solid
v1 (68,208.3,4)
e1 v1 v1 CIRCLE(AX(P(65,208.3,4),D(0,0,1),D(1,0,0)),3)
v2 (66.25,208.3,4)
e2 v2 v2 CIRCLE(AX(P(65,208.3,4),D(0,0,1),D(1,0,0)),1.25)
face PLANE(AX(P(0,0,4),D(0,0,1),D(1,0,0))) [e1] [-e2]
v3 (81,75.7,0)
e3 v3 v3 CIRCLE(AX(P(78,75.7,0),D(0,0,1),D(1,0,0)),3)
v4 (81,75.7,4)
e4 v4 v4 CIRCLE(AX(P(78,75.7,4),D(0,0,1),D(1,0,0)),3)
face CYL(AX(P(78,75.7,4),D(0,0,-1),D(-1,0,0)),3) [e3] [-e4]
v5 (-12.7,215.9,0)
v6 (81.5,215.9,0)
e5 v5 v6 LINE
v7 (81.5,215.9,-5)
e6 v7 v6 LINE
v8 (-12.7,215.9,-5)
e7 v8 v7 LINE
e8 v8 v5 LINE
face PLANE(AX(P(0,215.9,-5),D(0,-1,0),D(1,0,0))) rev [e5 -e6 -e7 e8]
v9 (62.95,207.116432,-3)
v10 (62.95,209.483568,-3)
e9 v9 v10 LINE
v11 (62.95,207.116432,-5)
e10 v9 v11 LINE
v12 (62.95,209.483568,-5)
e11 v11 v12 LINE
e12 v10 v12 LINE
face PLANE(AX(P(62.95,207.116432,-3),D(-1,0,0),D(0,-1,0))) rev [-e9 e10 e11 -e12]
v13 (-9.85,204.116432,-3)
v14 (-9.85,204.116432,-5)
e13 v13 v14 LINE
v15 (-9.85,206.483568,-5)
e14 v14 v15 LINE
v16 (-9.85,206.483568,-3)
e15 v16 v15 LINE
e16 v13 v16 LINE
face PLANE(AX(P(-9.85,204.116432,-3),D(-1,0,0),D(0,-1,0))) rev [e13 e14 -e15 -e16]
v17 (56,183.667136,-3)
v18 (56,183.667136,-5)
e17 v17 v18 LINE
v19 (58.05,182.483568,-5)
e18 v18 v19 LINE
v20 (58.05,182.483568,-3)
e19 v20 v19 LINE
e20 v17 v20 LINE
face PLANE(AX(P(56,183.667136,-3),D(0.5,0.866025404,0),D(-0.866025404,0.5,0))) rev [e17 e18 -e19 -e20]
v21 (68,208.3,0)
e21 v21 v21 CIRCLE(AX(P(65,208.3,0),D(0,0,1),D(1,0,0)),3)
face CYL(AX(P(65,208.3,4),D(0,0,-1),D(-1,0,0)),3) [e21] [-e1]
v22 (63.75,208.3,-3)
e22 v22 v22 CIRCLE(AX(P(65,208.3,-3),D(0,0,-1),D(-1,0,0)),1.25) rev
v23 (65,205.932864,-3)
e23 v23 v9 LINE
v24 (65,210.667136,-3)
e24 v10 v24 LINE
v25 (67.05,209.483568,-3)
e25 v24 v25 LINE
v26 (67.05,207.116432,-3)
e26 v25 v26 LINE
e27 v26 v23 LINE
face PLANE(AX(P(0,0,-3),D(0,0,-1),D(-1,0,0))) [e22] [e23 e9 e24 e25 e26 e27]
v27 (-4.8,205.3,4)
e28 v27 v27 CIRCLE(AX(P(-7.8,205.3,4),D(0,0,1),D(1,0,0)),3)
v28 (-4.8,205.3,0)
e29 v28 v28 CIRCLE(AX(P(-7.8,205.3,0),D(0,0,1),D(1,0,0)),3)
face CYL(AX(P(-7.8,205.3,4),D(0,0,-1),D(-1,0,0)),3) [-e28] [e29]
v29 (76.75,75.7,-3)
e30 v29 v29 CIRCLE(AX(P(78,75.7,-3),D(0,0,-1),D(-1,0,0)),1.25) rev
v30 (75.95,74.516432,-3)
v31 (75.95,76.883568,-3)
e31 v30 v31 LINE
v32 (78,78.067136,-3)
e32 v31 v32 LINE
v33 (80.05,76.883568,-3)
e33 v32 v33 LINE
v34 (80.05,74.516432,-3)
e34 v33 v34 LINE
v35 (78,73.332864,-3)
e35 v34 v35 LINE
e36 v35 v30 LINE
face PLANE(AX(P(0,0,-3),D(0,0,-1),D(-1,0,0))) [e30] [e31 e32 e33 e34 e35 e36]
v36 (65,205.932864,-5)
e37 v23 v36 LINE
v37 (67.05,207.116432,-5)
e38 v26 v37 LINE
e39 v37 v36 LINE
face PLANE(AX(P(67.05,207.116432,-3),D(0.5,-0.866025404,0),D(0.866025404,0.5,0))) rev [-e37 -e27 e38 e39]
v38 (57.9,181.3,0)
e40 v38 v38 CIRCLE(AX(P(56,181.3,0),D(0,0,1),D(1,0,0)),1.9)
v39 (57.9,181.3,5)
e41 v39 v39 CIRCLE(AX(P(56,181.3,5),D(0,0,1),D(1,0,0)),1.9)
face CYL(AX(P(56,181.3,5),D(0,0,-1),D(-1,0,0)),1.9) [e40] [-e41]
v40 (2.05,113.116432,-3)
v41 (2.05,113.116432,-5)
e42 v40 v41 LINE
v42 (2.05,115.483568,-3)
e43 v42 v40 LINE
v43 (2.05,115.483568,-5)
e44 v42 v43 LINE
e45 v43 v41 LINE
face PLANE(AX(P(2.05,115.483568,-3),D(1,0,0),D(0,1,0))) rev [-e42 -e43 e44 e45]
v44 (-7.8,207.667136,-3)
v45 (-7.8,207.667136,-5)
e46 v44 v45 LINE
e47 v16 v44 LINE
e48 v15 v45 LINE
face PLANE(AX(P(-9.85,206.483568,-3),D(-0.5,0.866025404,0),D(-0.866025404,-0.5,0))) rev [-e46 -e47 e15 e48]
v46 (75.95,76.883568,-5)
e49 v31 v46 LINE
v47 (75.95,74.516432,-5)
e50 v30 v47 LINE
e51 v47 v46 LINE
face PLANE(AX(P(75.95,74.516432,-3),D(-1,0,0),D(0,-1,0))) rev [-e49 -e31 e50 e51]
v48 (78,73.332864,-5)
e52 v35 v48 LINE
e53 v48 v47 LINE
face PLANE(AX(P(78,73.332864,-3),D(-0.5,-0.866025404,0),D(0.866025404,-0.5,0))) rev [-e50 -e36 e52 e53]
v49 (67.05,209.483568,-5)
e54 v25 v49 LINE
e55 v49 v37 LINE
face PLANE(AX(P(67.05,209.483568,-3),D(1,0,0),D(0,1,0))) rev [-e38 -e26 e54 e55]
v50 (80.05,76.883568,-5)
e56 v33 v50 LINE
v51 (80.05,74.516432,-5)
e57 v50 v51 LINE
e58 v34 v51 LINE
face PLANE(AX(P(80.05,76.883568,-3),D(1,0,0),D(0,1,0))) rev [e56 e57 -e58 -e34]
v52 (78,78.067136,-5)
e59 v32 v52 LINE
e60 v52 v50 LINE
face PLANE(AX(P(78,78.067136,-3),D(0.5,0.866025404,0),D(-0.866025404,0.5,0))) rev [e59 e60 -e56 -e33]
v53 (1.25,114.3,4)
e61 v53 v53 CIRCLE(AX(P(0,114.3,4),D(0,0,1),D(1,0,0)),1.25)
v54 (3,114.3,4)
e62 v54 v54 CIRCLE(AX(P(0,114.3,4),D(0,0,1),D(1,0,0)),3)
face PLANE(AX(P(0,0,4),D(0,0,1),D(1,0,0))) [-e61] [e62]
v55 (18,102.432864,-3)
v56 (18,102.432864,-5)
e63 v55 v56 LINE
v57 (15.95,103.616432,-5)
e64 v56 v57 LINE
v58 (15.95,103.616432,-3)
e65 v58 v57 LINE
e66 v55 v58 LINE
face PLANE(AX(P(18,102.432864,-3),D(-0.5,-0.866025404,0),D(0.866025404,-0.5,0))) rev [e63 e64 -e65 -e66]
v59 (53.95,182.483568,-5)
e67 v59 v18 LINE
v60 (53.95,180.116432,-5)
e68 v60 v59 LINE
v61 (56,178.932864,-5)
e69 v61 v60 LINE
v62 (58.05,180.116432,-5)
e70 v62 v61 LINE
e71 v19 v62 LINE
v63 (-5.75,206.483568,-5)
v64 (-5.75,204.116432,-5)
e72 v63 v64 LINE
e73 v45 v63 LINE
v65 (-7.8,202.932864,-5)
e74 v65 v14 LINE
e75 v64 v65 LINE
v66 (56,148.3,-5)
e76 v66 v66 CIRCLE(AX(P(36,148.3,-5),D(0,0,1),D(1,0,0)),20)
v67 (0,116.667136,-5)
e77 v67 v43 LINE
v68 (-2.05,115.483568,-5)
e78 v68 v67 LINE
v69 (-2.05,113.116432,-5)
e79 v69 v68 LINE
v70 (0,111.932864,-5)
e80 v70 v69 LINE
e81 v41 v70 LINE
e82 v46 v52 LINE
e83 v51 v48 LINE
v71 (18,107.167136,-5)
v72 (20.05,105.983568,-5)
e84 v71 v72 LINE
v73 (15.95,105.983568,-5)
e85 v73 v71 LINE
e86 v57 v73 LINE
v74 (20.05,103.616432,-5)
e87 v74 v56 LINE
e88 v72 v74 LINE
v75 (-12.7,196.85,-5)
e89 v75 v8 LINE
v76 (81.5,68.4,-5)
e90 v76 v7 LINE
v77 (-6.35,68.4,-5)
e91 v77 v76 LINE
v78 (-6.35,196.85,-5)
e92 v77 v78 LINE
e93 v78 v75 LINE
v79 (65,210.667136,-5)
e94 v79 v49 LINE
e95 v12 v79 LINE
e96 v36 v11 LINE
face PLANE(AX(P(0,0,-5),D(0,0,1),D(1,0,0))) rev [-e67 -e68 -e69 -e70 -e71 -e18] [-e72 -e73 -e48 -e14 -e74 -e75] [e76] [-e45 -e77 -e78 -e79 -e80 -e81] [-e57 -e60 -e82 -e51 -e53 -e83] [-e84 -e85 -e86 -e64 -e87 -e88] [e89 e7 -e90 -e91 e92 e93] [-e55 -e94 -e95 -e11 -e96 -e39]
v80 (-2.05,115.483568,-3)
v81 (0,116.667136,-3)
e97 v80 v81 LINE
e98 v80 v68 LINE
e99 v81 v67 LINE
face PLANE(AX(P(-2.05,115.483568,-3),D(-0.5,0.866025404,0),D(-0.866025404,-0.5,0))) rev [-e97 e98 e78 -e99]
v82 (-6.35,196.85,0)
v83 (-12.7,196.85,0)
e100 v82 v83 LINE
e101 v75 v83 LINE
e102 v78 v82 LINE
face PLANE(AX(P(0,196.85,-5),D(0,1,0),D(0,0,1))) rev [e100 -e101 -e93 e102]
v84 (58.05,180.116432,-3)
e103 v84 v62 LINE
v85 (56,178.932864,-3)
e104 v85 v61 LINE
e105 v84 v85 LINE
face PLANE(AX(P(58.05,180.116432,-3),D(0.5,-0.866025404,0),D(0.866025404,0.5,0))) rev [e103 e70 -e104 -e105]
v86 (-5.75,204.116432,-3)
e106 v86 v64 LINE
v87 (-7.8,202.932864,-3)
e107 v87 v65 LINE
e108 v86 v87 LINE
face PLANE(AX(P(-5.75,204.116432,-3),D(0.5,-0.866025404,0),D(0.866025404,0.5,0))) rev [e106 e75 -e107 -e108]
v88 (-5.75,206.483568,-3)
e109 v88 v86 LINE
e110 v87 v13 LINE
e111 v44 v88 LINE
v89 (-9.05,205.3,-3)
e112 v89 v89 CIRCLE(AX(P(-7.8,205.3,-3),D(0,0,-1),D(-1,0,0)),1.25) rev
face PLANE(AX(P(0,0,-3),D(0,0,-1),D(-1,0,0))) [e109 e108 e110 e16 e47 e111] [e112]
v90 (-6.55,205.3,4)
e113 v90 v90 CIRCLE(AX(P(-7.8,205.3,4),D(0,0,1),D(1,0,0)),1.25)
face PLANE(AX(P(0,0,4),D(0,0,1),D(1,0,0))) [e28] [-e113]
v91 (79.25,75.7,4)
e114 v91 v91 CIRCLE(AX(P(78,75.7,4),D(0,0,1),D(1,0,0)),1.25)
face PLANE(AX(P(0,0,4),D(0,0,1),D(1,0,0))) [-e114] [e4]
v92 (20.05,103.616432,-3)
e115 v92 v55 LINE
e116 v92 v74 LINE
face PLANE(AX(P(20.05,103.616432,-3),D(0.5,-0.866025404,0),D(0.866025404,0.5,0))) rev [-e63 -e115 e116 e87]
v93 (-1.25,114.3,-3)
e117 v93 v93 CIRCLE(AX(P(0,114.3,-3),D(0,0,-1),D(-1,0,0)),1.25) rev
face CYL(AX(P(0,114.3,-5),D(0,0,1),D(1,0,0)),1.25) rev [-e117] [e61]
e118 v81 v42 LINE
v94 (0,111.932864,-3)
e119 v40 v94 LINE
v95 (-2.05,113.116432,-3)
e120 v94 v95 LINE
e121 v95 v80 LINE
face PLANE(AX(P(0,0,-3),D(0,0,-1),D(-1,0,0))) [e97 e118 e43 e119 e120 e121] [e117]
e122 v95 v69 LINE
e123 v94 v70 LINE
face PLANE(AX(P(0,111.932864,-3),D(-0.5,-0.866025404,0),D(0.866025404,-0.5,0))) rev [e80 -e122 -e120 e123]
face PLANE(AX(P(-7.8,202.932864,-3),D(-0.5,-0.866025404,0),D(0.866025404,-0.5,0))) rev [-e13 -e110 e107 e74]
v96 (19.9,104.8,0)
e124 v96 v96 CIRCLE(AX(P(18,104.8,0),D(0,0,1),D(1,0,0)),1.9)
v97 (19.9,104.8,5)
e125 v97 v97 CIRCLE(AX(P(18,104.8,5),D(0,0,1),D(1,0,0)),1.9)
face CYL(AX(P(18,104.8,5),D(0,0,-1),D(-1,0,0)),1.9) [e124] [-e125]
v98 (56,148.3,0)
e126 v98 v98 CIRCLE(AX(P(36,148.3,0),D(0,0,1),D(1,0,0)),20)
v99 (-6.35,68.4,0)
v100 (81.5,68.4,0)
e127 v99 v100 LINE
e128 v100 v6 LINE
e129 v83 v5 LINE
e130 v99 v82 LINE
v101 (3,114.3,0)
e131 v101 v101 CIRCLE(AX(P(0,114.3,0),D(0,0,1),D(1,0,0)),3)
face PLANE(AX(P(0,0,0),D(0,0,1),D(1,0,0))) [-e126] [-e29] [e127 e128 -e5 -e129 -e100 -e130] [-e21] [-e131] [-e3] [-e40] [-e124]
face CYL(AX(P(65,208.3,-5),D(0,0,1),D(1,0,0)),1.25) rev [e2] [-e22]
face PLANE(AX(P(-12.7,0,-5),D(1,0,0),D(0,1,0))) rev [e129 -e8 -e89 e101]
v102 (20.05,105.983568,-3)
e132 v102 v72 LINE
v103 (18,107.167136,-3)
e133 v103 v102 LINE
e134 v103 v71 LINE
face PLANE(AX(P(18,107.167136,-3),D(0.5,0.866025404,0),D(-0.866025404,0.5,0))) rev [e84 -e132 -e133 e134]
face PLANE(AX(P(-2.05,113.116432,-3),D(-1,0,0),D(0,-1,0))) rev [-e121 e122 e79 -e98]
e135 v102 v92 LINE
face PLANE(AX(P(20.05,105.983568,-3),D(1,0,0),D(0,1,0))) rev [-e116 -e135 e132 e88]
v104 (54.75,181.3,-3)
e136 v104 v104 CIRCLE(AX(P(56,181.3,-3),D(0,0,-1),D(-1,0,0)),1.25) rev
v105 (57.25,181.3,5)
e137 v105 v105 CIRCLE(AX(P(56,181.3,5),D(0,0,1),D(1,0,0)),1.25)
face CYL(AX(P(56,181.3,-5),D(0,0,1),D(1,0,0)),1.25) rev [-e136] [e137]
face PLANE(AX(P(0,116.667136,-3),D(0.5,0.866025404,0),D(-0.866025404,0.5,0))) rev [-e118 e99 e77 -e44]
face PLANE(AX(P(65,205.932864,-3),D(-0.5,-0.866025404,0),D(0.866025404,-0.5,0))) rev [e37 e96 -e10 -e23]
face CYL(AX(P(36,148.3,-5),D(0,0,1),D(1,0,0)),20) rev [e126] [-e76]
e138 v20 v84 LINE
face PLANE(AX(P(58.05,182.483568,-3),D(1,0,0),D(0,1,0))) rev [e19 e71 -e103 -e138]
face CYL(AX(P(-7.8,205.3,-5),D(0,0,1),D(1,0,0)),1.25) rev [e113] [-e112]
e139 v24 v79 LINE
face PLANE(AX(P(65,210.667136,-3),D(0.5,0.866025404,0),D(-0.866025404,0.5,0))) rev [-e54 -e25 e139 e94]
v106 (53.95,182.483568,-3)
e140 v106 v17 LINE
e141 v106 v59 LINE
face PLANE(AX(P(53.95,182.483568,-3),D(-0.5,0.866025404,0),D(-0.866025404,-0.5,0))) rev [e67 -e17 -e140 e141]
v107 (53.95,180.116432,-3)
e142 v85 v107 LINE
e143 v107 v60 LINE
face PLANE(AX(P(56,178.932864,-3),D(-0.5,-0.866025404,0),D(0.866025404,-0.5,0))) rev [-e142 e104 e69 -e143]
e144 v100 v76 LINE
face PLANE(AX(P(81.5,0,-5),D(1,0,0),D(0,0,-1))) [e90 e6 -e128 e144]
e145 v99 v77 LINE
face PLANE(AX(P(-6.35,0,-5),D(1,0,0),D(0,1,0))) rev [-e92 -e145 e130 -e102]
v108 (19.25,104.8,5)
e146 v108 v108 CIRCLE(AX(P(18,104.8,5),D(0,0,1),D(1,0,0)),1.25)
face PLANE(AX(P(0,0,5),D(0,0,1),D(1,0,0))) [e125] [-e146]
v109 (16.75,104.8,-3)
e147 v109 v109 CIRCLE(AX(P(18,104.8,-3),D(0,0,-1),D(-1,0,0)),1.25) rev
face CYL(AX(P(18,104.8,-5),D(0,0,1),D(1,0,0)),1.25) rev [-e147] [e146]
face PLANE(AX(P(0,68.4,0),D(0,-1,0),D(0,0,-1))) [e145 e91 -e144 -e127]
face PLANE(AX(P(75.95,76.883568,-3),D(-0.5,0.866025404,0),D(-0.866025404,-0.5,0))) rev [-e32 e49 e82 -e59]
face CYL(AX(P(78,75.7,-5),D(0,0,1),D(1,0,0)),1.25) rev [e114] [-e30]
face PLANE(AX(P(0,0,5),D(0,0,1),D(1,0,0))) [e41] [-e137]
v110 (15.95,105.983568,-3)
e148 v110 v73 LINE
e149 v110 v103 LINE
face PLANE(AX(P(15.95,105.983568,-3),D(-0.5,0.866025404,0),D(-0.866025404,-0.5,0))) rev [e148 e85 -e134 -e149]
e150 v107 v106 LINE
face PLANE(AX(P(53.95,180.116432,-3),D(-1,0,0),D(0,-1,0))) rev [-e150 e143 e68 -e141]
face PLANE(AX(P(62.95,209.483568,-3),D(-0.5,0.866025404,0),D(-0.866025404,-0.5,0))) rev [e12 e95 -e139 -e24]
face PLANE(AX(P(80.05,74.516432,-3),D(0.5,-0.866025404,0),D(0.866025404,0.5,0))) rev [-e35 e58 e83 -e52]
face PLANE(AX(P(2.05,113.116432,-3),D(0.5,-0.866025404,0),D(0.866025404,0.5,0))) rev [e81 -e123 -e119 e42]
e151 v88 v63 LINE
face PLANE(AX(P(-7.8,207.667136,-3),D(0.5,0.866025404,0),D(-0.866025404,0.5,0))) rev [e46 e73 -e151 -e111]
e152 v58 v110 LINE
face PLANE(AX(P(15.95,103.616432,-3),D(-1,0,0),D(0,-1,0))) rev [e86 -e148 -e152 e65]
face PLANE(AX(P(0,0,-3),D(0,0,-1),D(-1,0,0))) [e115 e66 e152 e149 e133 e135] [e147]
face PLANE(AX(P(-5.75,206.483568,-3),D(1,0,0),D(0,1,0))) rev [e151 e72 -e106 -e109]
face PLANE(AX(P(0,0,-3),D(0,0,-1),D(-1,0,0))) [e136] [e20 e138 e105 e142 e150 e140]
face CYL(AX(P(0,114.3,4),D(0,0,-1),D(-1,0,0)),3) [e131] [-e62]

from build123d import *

# Parameters (mm, degrees)
SKETCH1_R           = 20
SKETCH1_R_2         = 1.25
BOSS_EXTRUDE1_DEPTH = 5
BOSS_EXTRUDE2_START = 4
SKETCH1_3_R         = 1.25
SKETCH1_3_R_2       = 3
BOSS_EXTRUDE2_DEPTH = 4
BOSS_EXTRUDE3_START = 5
SKETCH1_5_R         = 1.9
SKETCH1_5_R_2       = 1.25
BOSS_EXTRUDE3_DEPTH = 5
CUT_EXTRUDE1_DEPTH  = 2
INTERSECT1_START    = -101.6
INTERSECT1_DEPTH    = 170


# Read off the part's stored shape, not the designer's step: Intersect1
with BuildPart() as part:
    # Sketch1 → Boss-Extrude1 (new body)
    with BuildSketch(Plane(origin=(0, 0, 0), x_dir=(0, 1, 0), z_dir=(0, 0, 1))):
        Polygon((-101.6, 25.4), (-101.6, -81.5), (215.9, -81.5), (215.9, 12.7), (196.85, 12.7), (196.85, 6.35), (-57.15, 6.35), (-57.15, 25.4), align=None)
        with Locations(Location((148.3, -36, 0), (0, 0, 270))):
            Circle(SKETCH1_R, mode=Mode.SUBTRACT)
        with Locations(Location((-92.5, 8, 0), (0, 0, 270))):
            Circle(SKETCH1_R_2, mode=Mode.SUBTRACT)
        with Locations(Location((205.3, 7.8, 0), (0, 0, 270))):
            Circle(SKETCH1_R_2, mode=Mode.SUBTRACT)
        with Locations(Location((-86.5, -73, 0), (0, 0, 270))):
            Circle(SKETCH1_R_2, mode=Mode.SUBTRACT)
        with Locations(Location((0, 0, 0), (0, 0, 270))):
            Circle(SKETCH1_R_2, mode=Mode.SUBTRACT)
        with Locations(Location((114.3, 0, 0), (0, 0, 270))):
            Circle(SKETCH1_R_2, mode=Mode.SUBTRACT)
        with Locations(Location((104.8, -18, 0), (0, 0, 270))):
            Circle(SKETCH1_R_2, mode=Mode.SUBTRACT)
        with Locations(Location((75.7, -78, 0), (0, 0, 270))):
            Circle(SKETCH1_R_2, mode=Mode.SUBTRACT)
        with Locations(Location((181.3, -56, 0), (0, 0, 270))):
            Circle(SKETCH1_R_2, mode=Mode.SUBTRACT)
        with Locations(Location((208.3, -65, 0), (0, 0, 270))):
            Circle(SKETCH1_R_2, mode=Mode.SUBTRACT)
    extrude(amount=-BOSS_EXTRUDE1_DEPTH)

    # Sketch1<3> → Boss-Extrude2 (add)
    # profile 1 of 9: a face of its own
    with BuildSketch(Plane(origin=(0, 0, 0), x_dir=(0, 1, 0), z_dir=(0, 0, 1)).offset(BOSS_EXTRUDE2_START)):
        with BuildLine():
            Line((-95.005493963, 6.35), (-89.994506037, 6.35))
            ThreePointArc((-89.994506037, 6.35), (-89.62628447, 7.13874565), (-89.5, 8))
            ThreePointArc((-89.5, 8), (-93.36125435, 10.87371553), (-95.005493963, 6.35))
        make_face()
        with Locations(Location((-92.5, 8, 0), (0, 0, 270))):
            Circle(SKETCH1_3_R, mode=Mode.SUBTRACT)
    # profile 2 of 9: a face of its own
    with BuildSketch(Plane(origin=(0, 0, 0), x_dir=(0, 1, 0), z_dir=(0, 0, 1)).offset(BOSS_EXTRUDE2_START)):
        with BuildLine():
            ThreePointArc((-95.005493963, 6.35), (-92.5, 5), (-89.994506037, 6.35))
            Line((-89.994506037, 6.35), (-95.005493963, 6.35))
        make_face()
    # profile 3 of 9: a face of its own
    with BuildSketch(Plane(origin=(0, 0, 0), x_dir=(0, 1, 0), z_dir=(0, 0, 1)).offset(BOSS_EXTRUDE2_START)):
        with Locations(Location((-86.5, -73, 0), (0, 0, 270))):
            Circle(SKETCH1_3_R_2)
        with Locations(Location((-86.5, -73, 0), (0, 0, 270))):
            Circle(SKETCH1_3_R, mode=Mode.SUBTRACT)
    # profile 4 of 9: a face of its own
    with BuildSketch(Plane(origin=(0, 0, 0), x_dir=(0, 1, 0), z_dir=(0, 0, 1)).offset(BOSS_EXTRUDE2_START)):
        with Locations(Location((0, 0, 0), (0, 0, 270))):
            Circle(SKETCH1_3_R_2)
        with Locations(Location((0, 0, 0), (0, 0, 270))):
            Circle(SKETCH1_3_R, mode=Mode.SUBTRACT)
    # profile 5 of 9: a face of its own
    with BuildSketch(Plane(origin=(0, 0, 0), x_dir=(0, 1, 0), z_dir=(0, 0, 1)).offset(BOSS_EXTRUDE2_START)):
        with Locations(Location((75.7, -78, 0), (0, 0, 270))):
            Circle(SKETCH1_3_R_2)
        with Locations(Location((75.7, -78, 0), (0, 0, 270))):
            Circle(SKETCH1_3_R, mode=Mode.SUBTRACT)
    # profile 6 of 9: a face of its own
    with BuildSketch(Plane(origin=(0, 0, 0), x_dir=(0, 1, 0), z_dir=(0, 0, 1)).offset(BOSS_EXTRUDE2_START)):
        with Locations(Location((114.3, 0, 0), (0, 0, 270))):
            Circle(SKETCH1_3_R_2)
        with Locations(Location((114.3, 0, 0), (0, 0, 270))):
            Circle(SKETCH1_3_R, mode=Mode.SUBTRACT)
    # profile 7 of 9: a face of its own
    with BuildSketch(Plane(origin=(0, 0, 0), x_dir=(0, 1, 0), z_dir=(0, 0, 1)).offset(BOSS_EXTRUDE2_START)):
        with Locations(Location((208.3, -65, 0), (0, 0, 270))):
            Circle(SKETCH1_3_R_2)
        with Locations(Location((208.3, -65, 0), (0, 0, 270))):
            Circle(SKETCH1_3_R, mode=Mode.SUBTRACT)
    # profile 8 of 9: a face of its own
    with BuildSketch(Plane(origin=(0, 0, 0), x_dir=(0, 1, 0), z_dir=(0, 0, 1)).offset(BOSS_EXTRUDE2_START)):
        with BuildLine():
            ThreePointArc((208.3, 7.8), (204.551310342, 10.705075523), (202.673690803, 6.35))
            Line((202.673690803, 6.35), (207.926309197, 6.35))
            ThreePointArc((207.926309197, 6.35), (208.205075523, 7.051310342), (208.3, 7.8))
        make_face()
        with Locations(Location((205.3, 7.8, 0), (0, 0, 270))):
            Circle(SKETCH1_3_R, mode=Mode.SUBTRACT)
    # profile 9 of 9: a face of its own
    with BuildSketch(Plane(origin=(0, 0, 0), x_dir=(0, 1, 0), z_dir=(0, 0, 1)).offset(BOSS_EXTRUDE2_START)):
        with BuildLine():
            Line((207.926309197, 6.35), (202.673690803, 6.35))
            ThreePointArc((202.673690803, 6.35), (205.3, 4.8), (207.926309197, 6.35))
        make_face()
    extrude(amount=-BOSS_EXTRUDE2_DEPTH)

    # Sketch1<5> → Boss-Extrude3 (add)
    # profile 1 of 2: a face of its own
    with BuildSketch(Plane(origin=(0, 0, 0), x_dir=(0, 1, 0), z_dir=(0, 0, 1)).offset(BOSS_EXTRUDE3_START)):
        with Locations(Location((104.8, -18, 0), (0, 0, 270))):
            Circle(SKETCH1_5_R)
        with Locations(Location((104.8, -18, 0), (0, 0, 270))):
            Circle(SKETCH1_5_R_2, mode=Mode.SUBTRACT)
    # profile 2 of 2: a face of its own
    with BuildSketch(Plane(origin=(0, 0, 0), x_dir=(0, 1, 0), z_dir=(0, 0, 1)).offset(BOSS_EXTRUDE3_START)):
        with Locations(Location((181.3, -56, 0), (0, 0, 270))):
            Circle(SKETCH1_5_R)
        with Locations(Location((181.3, -56, 0), (0, 0, 270))):
            Circle(SKETCH1_5_R_2, mode=Mode.SUBTRACT)
    extrude(amount=-BOSS_EXTRUDE3_DEPTH)

    # Sketch3 → Cut-Extrude1 (cut)
    with BuildSketch(Plane(origin=(0, 0, -5), x_dir=(1, 0, 0), z_dir=(0, 0, -1))):
        Polygon((78, -78.067136104), (80.05, -76.883568052), (80.05, -74.516431948), (78, -73.332863896), (75.95, -74.516431948), (75.95, -76.883568052), align=None)
        Polygon((65, -210.667136104), (67.05, -209.483568052), (67.05, -207.116431948), (65, -205.932863896), (62.95, -207.116431948), (62.95, -209.483568052), align=None)
        Polygon((56, -183.667136104), (58.05, -182.483568052), (58.05, -180.116431948), (56, -178.932863896), (53.95, -180.116431948), (53.95, -182.483568052), align=None)
        Polygon((-7.8, -207.667136104), (-5.75, -206.483568052), (-5.75, -204.116431948), (-7.8, -202.932863896), (-9.85, -204.116431948), (-9.85, -206.483568052), align=None)
        Polygon((0, -116.667136104), (2.05, -115.483568052), (2.05, -113.116431948), (0, -111.932863896), (-2.05, -113.116431948), (-2.05, -115.483568052), align=None)
        Polygon((18, -107.167136104), (20.05, -105.983568052), (20.05, -103.616431948), (18, -102.432863896), (15.95, -103.616431948), (15.95, -105.983568052), align=None)
        Polygon((0, -2.367136104), (2.05, -1.183568052), (2.05, 1.183568052), (0, 2.367136104), (-2.05, 1.183568052), (-2.05, -1.183568052), align=None)
        Polygon((-8, 90.132863896), (-5.95, 91.316431948), (-5.95, 93.683568052), (-8, 94.867136104), (-10.05, 93.683568052), (-10.05, 91.316431948), align=None)
        Polygon((73, 84.132863896), (75.05, 85.316431948), (75.05, 87.683568052), (73, 88.867136104), (70.95, 87.683568052), (70.95, 85.316431948), align=None)
    extrude(amount=-CUT_EXTRUDE1_DEPTH, mode=Mode.SUBTRACT)

    # Intersect1 outline → Intersect1 (cut)
    with BuildSketch(Plane(origin=(0, 0, 0), x_dir=(1, 0, 0), z_dir=(0, 1, 0)).offset(INTERSECT1_START)):
        Polygon((83, -4), (83, 6), (75.05, 6), (75.05, 5), (-10.05, 5), (-10.05, 6), (-27, 6), (-27, -4), align=None)
    extrude(amount=INTERSECT1_DEPTH, mode=Mode.SUBTRACT)


solid = part.part
